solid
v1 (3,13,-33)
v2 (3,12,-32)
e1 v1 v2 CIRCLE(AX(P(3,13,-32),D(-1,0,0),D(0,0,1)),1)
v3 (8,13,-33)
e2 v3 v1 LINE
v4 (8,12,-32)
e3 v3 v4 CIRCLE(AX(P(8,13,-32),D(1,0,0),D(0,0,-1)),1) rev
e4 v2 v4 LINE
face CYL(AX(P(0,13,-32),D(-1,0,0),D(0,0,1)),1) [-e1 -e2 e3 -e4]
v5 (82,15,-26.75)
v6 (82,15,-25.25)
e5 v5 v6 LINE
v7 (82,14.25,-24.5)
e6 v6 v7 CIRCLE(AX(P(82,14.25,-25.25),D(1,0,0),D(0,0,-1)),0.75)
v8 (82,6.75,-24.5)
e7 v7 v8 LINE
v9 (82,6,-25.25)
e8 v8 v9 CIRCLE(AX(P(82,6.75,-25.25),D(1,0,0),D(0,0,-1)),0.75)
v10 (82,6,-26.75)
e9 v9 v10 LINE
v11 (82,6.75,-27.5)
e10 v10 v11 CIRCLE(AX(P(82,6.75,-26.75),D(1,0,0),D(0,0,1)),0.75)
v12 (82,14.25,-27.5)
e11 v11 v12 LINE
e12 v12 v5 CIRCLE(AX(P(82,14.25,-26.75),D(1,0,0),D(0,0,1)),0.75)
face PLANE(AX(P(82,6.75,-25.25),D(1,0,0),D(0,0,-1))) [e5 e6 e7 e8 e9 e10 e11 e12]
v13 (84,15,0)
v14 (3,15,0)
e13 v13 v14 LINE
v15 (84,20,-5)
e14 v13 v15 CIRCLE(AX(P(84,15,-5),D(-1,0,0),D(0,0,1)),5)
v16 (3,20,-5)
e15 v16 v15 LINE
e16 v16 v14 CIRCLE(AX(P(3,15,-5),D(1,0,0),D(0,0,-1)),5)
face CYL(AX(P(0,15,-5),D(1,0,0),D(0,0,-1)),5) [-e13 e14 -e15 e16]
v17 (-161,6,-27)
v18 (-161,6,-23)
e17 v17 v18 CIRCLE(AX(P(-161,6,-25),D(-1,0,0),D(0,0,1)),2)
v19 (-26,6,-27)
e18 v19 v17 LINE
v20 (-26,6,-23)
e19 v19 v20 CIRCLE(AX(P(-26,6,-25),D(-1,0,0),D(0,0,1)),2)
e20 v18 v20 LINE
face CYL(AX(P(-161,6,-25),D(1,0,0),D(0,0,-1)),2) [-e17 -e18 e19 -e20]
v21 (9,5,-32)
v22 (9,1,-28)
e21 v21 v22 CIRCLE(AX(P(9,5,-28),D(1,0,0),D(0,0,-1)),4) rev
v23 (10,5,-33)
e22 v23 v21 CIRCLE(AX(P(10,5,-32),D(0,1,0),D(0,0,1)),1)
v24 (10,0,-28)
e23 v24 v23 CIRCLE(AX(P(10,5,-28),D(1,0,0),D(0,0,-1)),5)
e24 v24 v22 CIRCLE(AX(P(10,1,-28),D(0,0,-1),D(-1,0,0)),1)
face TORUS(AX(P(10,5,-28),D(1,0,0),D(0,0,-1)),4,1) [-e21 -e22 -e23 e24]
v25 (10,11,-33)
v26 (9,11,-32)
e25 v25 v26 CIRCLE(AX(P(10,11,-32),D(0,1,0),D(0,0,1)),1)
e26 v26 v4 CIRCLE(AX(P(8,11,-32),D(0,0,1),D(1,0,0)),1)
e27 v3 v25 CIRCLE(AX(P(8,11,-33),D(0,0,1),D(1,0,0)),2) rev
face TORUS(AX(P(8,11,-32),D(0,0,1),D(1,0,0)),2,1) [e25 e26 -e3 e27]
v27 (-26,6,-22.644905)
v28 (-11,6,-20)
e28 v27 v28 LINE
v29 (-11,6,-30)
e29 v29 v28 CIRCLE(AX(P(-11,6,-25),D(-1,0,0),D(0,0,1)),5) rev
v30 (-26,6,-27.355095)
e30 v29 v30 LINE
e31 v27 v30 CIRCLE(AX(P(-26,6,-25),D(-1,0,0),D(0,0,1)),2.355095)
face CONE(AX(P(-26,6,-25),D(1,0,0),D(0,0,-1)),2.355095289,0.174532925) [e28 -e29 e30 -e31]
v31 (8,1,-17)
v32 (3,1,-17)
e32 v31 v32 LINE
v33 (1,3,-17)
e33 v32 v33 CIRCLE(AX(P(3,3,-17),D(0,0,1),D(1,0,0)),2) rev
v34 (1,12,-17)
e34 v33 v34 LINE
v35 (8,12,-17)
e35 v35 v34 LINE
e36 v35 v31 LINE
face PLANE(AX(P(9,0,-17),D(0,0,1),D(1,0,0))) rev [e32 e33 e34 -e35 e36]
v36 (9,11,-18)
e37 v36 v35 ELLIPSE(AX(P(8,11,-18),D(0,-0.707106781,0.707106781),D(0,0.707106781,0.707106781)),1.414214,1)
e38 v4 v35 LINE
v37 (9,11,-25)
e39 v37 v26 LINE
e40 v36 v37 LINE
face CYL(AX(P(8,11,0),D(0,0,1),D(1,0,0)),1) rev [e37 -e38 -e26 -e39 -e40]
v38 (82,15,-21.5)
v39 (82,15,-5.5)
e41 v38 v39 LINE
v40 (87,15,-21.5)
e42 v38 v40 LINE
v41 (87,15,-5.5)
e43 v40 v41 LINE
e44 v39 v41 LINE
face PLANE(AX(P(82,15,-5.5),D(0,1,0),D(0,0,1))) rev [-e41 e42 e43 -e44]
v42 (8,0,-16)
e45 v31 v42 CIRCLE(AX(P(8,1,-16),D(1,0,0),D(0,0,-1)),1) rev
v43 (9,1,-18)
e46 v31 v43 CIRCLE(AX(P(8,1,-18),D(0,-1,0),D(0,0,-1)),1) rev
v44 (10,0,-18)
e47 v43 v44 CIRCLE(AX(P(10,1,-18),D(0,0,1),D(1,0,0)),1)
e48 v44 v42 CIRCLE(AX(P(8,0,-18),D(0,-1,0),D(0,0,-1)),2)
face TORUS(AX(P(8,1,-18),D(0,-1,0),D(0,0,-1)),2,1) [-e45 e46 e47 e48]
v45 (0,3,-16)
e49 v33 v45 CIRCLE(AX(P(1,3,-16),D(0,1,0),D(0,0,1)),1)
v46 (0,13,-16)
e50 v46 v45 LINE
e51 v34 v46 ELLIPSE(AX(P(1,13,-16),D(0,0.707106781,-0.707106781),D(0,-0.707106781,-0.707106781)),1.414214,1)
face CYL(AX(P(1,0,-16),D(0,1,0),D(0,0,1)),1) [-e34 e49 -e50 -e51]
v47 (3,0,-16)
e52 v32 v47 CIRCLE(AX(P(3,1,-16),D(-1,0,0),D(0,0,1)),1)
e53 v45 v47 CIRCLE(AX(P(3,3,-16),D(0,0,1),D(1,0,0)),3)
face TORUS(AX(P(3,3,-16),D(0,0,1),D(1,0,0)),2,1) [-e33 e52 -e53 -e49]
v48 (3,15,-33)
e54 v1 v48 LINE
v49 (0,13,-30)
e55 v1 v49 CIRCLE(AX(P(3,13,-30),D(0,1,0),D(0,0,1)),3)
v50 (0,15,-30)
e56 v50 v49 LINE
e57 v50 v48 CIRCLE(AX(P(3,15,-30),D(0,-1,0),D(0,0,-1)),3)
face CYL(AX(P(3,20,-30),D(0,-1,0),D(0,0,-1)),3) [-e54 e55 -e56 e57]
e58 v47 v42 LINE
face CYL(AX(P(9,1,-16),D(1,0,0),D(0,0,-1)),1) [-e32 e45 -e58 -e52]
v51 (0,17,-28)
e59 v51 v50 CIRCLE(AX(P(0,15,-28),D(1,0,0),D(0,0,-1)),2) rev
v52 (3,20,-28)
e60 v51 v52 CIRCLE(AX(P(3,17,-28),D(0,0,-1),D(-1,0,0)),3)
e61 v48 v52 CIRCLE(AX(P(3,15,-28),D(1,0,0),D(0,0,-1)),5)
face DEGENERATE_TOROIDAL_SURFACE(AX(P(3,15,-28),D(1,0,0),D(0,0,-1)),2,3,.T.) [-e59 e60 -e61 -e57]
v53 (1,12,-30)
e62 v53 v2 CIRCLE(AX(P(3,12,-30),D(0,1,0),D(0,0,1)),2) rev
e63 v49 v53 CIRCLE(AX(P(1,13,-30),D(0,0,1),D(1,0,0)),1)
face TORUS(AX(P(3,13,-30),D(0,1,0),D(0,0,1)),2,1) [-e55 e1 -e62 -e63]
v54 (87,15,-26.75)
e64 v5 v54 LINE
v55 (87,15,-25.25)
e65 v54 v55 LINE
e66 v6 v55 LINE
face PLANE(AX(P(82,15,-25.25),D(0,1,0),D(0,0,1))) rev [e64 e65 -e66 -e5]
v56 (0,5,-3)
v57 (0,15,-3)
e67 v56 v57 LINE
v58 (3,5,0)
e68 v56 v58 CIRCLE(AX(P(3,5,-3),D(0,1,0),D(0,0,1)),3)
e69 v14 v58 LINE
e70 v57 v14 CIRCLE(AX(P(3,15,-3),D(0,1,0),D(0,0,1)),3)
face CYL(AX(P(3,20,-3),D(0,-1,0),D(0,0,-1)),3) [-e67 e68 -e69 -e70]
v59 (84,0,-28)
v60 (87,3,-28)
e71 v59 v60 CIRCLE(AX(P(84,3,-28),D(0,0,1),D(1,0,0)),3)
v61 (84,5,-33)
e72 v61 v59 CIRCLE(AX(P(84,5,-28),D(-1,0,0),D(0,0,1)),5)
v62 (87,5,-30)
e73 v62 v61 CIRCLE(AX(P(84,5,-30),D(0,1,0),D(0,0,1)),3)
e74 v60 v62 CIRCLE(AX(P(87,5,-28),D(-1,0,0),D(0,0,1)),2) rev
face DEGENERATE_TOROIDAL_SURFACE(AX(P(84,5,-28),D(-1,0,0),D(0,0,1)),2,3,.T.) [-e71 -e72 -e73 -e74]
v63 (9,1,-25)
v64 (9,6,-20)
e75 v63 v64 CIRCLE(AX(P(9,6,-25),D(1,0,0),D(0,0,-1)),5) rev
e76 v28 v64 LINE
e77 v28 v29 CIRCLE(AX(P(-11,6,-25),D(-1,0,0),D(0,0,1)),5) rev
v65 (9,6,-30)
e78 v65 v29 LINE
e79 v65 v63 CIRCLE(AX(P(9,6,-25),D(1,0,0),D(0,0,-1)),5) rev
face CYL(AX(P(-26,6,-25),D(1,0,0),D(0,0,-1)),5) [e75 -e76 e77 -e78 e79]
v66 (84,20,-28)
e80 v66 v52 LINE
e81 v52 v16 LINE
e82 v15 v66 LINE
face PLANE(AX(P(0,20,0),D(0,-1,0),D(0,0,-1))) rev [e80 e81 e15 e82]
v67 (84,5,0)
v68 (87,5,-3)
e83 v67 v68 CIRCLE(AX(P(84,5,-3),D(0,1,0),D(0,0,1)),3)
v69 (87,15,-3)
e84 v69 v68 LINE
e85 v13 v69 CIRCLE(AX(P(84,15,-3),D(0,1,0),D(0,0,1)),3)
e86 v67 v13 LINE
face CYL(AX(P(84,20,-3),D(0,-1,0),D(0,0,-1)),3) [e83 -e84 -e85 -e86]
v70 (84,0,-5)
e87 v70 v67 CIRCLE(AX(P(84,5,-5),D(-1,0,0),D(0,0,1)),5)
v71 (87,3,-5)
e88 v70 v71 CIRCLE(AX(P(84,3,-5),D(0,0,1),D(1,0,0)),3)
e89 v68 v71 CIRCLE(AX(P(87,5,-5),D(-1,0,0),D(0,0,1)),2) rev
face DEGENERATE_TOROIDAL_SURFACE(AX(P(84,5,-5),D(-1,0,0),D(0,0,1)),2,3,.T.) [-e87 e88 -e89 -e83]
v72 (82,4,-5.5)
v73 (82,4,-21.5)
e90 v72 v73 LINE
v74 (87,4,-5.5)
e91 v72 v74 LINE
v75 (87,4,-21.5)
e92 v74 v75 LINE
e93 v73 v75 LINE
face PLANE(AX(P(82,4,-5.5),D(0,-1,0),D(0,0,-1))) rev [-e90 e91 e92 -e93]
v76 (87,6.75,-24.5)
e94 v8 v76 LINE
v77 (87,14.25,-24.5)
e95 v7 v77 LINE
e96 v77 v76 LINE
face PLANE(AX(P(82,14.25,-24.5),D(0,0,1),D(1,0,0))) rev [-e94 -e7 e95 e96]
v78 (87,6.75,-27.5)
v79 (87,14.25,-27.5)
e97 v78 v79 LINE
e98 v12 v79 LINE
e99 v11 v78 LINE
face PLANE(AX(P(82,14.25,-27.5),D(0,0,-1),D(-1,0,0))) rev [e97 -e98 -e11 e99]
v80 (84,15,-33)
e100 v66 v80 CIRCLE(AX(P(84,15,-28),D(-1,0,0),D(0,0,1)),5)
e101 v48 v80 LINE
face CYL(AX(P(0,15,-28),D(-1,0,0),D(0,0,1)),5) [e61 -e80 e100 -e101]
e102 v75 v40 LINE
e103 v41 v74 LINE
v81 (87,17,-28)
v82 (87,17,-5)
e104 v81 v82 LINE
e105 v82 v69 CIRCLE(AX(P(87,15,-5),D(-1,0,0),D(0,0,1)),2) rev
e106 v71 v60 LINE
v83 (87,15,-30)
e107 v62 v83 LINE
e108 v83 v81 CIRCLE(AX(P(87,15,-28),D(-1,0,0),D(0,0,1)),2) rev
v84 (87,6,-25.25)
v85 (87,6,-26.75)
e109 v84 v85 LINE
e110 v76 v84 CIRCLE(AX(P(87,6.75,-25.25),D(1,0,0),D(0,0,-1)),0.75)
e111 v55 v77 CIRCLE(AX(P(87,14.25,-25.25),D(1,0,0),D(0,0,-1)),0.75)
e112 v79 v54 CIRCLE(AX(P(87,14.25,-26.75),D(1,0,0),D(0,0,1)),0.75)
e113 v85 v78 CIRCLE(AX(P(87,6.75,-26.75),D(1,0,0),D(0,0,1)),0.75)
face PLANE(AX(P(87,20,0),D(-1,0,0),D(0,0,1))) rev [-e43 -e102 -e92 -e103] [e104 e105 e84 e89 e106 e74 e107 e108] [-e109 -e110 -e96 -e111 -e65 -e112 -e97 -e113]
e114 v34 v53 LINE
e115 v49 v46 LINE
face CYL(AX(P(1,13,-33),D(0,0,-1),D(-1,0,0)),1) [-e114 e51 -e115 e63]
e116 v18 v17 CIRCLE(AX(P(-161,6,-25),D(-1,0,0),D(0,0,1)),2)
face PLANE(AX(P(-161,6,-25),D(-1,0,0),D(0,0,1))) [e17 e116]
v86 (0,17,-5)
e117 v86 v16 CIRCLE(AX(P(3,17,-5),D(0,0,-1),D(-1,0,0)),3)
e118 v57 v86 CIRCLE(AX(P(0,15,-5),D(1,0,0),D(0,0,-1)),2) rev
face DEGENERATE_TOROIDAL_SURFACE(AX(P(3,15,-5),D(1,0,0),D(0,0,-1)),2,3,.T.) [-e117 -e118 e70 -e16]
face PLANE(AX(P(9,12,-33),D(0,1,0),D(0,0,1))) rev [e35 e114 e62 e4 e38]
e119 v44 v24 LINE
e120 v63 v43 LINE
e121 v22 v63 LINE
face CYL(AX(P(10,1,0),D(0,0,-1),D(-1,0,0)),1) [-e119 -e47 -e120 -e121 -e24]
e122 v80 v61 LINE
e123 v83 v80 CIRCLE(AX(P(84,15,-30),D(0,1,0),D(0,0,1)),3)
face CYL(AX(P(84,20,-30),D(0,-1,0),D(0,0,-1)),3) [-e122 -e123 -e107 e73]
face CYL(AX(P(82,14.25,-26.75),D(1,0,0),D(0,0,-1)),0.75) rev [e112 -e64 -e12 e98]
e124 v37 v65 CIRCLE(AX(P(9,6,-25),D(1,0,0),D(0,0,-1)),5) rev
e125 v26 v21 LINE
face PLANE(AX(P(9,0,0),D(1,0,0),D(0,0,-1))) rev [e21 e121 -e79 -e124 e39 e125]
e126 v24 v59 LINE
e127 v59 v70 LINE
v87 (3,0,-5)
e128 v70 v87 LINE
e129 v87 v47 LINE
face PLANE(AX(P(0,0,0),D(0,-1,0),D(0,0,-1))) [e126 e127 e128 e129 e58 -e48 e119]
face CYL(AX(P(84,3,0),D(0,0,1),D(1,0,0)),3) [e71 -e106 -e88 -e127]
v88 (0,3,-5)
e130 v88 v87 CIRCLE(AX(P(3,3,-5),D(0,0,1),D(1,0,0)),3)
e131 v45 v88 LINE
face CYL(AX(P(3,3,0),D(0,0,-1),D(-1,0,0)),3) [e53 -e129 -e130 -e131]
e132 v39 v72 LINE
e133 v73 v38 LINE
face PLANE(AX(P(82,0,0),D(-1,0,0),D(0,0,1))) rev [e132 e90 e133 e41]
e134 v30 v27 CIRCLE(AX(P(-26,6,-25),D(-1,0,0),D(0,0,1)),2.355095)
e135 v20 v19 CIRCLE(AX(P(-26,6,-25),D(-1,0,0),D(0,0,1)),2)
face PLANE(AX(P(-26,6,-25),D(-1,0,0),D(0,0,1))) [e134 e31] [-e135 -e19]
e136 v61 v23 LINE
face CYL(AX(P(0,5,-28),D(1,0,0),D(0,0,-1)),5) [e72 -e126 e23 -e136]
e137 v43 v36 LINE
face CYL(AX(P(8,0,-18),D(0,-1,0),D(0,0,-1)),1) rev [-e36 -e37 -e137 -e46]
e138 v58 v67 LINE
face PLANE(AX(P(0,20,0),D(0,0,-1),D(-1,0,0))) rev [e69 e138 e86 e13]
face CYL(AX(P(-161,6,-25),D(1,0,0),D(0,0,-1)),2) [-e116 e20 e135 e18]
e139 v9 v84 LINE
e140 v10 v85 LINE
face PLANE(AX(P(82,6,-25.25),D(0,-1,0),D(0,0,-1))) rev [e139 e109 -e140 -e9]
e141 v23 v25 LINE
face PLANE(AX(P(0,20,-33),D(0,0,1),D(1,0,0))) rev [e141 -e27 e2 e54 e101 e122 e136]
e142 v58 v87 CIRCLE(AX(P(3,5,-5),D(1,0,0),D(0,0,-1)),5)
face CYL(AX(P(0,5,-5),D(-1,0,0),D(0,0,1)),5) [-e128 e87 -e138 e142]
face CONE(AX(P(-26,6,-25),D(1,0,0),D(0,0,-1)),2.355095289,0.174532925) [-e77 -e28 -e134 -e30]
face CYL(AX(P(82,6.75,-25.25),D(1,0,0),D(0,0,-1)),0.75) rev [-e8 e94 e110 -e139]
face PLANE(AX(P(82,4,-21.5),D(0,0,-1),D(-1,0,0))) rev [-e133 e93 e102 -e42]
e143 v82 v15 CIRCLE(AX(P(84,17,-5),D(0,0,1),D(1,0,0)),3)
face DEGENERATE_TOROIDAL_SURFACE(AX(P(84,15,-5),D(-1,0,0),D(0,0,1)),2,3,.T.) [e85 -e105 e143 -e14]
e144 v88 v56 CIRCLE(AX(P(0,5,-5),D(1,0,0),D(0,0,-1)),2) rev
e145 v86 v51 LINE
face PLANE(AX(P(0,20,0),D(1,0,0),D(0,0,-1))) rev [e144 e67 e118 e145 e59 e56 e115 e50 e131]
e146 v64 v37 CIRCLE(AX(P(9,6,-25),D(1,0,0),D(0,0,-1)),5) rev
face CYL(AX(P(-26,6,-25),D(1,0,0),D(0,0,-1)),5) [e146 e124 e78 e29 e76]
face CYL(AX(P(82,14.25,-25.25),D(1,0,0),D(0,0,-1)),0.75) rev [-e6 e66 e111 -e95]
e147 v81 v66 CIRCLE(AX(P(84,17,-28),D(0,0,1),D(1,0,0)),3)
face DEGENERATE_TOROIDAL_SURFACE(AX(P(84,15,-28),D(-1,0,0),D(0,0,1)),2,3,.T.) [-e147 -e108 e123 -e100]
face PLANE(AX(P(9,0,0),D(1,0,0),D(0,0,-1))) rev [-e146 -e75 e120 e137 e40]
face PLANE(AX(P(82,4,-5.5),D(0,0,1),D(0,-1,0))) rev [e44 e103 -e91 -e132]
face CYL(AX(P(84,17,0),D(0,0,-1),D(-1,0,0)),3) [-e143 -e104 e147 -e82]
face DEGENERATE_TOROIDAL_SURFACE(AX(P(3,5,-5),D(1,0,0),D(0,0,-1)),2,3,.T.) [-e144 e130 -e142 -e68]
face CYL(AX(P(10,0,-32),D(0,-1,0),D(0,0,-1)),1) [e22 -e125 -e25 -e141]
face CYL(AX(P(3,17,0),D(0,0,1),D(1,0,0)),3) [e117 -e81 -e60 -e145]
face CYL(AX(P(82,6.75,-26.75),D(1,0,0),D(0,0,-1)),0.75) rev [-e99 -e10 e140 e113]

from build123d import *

# Parameters (mm, degrees)
SKETCH1_W           = 87
SKETCH1_H           = 33
BOSS_EXTRUDE1_DEPTH = 20
SKETCH3_W           = 16
SKETCH3_H           = 12
CUT_EXTRUDE1_DEPTH  = 9
SKETCH4_R           = 5
BOSS_EXTRUDE2_DEPTH = 35
SKETCH5_R           = 2
BOSS_EXTRUDE3_DEPTH = 135
SKETCH6_W           = 16
SKETCH6_H           = 11
CUT_EXTRUDE2_DEPTH  = 5
FILLET1_R           = 5
FILLET2_R           = 3
FILLET3_R           = 1
CHAMFER2_SIZE       = 15
CHAMFER2_SIZE2      = 2.644904711


with BuildPart() as part:
    # Sketch1 → Boss-Extrude1 (new body)
    with BuildSketch(Plane(origin=(0, 0, 0), x_dir=(1, 0, 0), z_dir=(0, 1, 0))):
        with Locations((43.5, 16.5)):
            Rectangle(SKETCH1_W, SKETCH1_H)
    extrude(amount=BOSS_EXTRUDE1_DEPTH)

    # Sketch3 → Cut-Extrude1 (cut)
    with BuildSketch(Plane.ZY):
        with Locations((-25, 6)):
            Rectangle(SKETCH3_W, SKETCH3_H)
    extrude(amount=-CUT_EXTRUDE1_DEPTH, mode=Mode.SUBTRACT)

    # Sketch4 → Boss-Extrude2 (add)
    with BuildSketch(Plane.ZY.offset(-9)):
        with Locations(Location((-25, 6, 0), (0, 0, 180))):
            Circle(SKETCH4_R)
    extrude(amount=BOSS_EXTRUDE2_DEPTH)

    # Sketch5 → Boss-Extrude3 (add)
    with BuildSketch(Plane.ZY.offset(26)):
        with Locations((-25, 6)):
            Circle(SKETCH5_R)
    extrude(amount=BOSS_EXTRUDE3_DEPTH)

    # Sketch6 → Cut-Extrude2 (cut)
    with BuildSketch(Plane(origin=(87, 0, 0), x_dir=(0, 0, -1), z_dir=(1, 0, 0))):
        with Locations((13.5, 9.5)):
            Rectangle(SKETCH6_W, SKETCH6_H)
        with BuildLine():
            Line((25.25, 15), (26.75, 15))
            ThreePointArc((26.75, 15), (27.280330086, 14.780330086), (27.5, 14.25))
            Line((27.5, 14.25), (27.5, 6.75))
            ThreePointArc((27.5, 6.75), (27.280330086, 6.219669914), (26.75, 6))
            Line((26.75, 6), (25.25, 6))
            ThreePointArc((25.25, 6), (24.719669914, 6.219669914), (24.5, 6.75))
            Line((24.5, 6.75), (24.5, 14.25))
            ThreePointArc((24.5, 14.25), (24.719669914, 14.780330086), (25.25, 15))
        make_face()
    extrude(amount=-CUT_EXTRUDE2_DEPTH, mode=Mode.SUBTRACT)

    # Fillet1
    fillet1_edges = [part.edges().sort_by_distance(p)[0] for p in [
        (43.5, 20, -33),
        (48, 0, -33),
        (43.5, 0, 0),
        (43.5, 20, 0),
    ]]
    fillet(fillet1_edges, radius=FILLET1_R)

    # Fillet2
    fillet2_edges = [part.edges().sort_by_distance(p)[0] for p in [
        (0, 0, -11),
        (0, 20, -16.5),
        (87, 20, -16.5),
        (0, 10, 0),
        (0, 13.5, -33),
        (0, 1.464466094, -1.464466094),
        (0, 18.535533906, -1.464466094),
        (0, 18.535533906, -31.535533906),
        (87, 10, -33),
        (87, 0, -16.5),
        (87, 10, 0),
        (87, 1.464466094, -31.535533906),
        (87, 1.464466094, -1.464466094),
        (87, 18.535533906, -1.464466094),
        (87, 18.535533906, -31.535533906),
    ]]
    fillet(fillet2_edges, radius=FILLET2_R)

    # Fillet3
    fillet3_edges = [part.edges().sort_by_distance(p)[0] for p in [
        (0, 7.5, -17),
        (0.878679656, 12, -32.121320344),
        (0.878679656, 0.878679656, -17),
        (9, 8.5, -33),
        (9, 12, -25),
        (6, 12, -33),
        (9, 6, -17),
        (6, 0, -17),
        (0, 12, -23.5),
        (9, 0, -22.5),
        (9, 1.464466094, -31.535533906),
    ]]
    fillet(fillet3_edges, radius=FILLET3_R - 0.0001)  # a hair under: the kernel refuses the full size

    # Chamfer2
    chamfer2_edges = [part.edges().sort_by_distance(p)[0] for p in [
        (-26, 6, -20),
    ]]
    chamfer2_side = [part.faces().sort_by_distance(p)[0] for p in [
        (-8.5, 6, -20),
    ]]
    chamfer(chamfer2_edges, length=CHAMFER2_SIZE, length2=CHAMFER2_SIZE2, reference=chamfer2_side[0])


solid = part.part
